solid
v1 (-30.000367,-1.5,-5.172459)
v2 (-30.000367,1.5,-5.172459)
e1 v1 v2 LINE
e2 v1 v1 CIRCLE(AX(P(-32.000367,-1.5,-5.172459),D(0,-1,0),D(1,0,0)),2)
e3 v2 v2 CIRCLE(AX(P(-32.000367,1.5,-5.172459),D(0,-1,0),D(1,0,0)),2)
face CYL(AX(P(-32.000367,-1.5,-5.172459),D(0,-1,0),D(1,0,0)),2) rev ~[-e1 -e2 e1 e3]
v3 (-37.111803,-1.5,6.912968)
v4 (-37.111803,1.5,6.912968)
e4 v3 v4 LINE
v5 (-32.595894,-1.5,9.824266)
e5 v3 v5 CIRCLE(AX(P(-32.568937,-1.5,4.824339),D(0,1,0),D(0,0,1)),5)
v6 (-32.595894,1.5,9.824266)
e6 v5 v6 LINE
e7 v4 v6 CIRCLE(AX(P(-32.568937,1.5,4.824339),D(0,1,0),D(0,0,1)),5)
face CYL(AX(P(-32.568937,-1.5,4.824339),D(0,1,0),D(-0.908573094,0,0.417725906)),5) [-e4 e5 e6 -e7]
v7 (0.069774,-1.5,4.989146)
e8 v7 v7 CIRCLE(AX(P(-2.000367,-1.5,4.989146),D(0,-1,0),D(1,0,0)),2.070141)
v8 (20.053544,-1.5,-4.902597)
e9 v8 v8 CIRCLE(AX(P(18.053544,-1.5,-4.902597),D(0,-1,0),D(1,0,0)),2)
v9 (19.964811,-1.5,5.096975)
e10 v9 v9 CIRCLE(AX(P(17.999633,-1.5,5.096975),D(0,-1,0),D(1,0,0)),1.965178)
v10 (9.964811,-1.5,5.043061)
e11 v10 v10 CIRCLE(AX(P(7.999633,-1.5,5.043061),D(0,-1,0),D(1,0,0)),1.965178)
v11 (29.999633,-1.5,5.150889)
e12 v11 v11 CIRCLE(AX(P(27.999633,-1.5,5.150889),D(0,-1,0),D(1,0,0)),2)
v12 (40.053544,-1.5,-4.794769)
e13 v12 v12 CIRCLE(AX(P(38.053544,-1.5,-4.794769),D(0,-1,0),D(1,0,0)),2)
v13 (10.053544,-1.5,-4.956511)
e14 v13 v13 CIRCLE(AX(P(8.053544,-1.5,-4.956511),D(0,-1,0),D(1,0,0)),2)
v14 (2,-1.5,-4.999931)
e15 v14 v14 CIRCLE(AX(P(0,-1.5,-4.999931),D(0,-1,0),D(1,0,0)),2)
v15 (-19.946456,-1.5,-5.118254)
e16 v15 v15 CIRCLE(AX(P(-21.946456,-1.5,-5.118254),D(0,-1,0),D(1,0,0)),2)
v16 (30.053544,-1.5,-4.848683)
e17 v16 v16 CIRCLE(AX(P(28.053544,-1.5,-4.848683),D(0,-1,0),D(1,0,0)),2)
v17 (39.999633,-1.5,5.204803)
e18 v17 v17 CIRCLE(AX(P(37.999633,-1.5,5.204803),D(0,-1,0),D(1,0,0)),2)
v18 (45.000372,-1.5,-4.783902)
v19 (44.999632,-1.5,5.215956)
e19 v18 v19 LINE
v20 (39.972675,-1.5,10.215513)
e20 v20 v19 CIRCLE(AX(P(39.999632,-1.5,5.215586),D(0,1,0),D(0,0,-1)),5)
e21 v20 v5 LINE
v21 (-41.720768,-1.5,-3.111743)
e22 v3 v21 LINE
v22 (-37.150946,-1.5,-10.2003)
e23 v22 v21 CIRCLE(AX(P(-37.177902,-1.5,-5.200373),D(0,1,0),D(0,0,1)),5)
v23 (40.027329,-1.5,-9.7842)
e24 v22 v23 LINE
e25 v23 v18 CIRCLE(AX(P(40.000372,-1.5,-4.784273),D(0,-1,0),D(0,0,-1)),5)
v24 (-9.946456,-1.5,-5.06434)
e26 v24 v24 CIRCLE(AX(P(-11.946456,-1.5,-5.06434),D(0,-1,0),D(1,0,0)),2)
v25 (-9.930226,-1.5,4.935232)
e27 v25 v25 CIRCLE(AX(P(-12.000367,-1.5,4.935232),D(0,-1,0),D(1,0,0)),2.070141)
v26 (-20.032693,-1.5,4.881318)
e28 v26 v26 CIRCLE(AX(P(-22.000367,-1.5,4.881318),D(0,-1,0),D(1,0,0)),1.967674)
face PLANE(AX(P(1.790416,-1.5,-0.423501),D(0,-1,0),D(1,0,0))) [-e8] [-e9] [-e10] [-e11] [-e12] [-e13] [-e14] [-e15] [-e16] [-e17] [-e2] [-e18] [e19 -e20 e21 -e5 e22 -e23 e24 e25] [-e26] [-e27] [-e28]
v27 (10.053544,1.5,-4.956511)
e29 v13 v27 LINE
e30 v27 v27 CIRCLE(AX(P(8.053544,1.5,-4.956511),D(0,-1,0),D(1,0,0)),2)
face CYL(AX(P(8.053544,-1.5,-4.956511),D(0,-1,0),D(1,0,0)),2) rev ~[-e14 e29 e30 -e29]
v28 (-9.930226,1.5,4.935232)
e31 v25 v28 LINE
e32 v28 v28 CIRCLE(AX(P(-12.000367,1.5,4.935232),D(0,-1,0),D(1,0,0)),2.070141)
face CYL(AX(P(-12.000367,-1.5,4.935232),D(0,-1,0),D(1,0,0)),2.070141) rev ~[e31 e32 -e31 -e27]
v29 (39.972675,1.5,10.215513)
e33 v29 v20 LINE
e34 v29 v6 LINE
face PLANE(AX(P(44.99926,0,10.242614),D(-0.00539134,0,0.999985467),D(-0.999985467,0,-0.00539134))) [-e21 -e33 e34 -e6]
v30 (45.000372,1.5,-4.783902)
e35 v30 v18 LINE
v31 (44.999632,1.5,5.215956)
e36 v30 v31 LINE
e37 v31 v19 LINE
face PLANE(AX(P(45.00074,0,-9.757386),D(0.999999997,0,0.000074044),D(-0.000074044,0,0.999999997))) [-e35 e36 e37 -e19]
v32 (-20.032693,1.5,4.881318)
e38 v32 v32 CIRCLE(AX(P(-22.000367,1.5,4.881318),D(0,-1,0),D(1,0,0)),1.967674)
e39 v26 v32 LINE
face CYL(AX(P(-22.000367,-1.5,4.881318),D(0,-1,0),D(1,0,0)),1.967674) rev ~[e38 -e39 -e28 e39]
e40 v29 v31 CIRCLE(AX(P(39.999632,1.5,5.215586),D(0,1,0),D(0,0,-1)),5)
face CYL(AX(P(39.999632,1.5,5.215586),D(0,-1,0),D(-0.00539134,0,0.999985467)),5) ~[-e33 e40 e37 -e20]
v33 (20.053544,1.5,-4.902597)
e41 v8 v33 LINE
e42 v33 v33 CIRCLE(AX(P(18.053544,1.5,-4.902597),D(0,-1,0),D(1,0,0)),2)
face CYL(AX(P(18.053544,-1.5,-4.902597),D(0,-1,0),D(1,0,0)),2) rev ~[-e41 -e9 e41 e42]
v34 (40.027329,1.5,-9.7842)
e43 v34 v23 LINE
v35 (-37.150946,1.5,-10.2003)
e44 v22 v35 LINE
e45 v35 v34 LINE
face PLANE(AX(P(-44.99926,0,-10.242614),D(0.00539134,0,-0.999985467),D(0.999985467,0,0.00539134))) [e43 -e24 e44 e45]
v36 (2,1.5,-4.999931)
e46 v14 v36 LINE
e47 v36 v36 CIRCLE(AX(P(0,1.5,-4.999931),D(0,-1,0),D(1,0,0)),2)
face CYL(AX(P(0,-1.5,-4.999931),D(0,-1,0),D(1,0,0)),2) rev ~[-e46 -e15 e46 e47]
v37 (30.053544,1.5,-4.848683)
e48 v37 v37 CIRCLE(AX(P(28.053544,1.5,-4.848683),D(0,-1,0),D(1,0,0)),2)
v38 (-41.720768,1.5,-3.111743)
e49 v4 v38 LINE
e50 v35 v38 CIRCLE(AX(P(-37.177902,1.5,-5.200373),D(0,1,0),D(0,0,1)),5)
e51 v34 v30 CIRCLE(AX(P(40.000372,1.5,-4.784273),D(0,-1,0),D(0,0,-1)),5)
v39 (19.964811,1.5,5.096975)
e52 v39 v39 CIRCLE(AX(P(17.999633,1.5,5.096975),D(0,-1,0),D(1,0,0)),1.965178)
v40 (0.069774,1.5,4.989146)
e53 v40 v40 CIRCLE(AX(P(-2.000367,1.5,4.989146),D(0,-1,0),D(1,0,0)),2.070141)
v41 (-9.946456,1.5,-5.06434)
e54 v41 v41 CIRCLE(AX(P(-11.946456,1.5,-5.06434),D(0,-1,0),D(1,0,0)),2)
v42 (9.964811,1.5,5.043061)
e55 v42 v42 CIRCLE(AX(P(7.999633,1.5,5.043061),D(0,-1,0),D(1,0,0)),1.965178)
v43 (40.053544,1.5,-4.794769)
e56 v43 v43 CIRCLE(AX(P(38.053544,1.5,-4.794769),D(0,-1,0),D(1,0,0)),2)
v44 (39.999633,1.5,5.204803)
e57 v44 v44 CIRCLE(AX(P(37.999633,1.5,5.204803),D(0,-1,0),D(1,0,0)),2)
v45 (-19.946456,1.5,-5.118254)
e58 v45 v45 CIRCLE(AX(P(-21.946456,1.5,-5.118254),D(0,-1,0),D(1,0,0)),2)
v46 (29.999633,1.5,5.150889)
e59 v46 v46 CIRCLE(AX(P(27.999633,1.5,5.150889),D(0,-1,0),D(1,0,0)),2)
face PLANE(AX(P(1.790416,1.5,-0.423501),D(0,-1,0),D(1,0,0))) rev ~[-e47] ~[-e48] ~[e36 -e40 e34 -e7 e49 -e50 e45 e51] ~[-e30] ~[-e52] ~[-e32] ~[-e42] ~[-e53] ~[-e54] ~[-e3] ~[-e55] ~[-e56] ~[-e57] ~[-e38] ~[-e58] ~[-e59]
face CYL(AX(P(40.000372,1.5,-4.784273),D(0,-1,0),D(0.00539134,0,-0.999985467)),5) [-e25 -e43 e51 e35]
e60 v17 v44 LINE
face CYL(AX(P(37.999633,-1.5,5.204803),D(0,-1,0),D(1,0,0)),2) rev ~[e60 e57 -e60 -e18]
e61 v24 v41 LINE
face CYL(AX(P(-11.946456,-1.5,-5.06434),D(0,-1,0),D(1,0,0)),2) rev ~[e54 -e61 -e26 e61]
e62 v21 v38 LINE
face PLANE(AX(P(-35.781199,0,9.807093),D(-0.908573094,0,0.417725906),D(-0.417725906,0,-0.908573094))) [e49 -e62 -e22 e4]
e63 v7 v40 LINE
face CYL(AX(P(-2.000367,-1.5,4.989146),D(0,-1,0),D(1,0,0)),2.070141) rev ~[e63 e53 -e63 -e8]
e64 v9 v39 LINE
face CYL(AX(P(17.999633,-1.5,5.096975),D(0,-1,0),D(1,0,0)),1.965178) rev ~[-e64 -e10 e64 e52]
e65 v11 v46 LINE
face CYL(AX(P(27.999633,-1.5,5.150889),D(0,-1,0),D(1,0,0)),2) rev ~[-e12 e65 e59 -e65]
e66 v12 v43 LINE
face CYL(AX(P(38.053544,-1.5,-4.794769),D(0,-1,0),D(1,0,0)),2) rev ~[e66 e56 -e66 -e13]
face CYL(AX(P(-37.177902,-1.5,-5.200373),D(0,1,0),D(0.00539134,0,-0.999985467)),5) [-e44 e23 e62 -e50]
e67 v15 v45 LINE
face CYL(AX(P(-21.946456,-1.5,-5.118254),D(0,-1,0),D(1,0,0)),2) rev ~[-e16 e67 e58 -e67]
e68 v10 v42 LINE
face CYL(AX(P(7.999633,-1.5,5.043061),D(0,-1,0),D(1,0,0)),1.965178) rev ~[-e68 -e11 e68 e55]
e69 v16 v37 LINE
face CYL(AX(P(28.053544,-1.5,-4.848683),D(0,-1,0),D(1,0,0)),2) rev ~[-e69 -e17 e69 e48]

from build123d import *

# Parameters (mm, degrees)
F1_DEPTH = 1.5
F2_R     = 5
F3_R     = 2
F3_R_2   = 1.965178389
F3_R_3   = 2.0701414228
F3_R_4   = 1.9676743652
F4_DEPTH = 25


# Not quite as in the source:
# - a feature names something its author has since deleted; it is built from what else it names


with BuildPart() as f1:
    # F0 (on Front) → F1 (new body, symmetric)
    with BuildSketch(Plane.XZ):
        Polygon((-44.9992595649, -10.2426138069), (45.0007404351, -9.7573861383), (44.9992595649, 10.2426138069), (-35.7811990629, 9.8070925446), align=None)
    extrude(amount=F1_DEPTH, both=True)

    # F2
    f2_edges = [f1.edges().sort_by_distance(p)[0] for p in [
        (45.00074, 0, -9.757386),
        (-35.781199, 0, 9.807093),
        (-44.99926, 0, -10.242614),
        (44.99926, 0, 10.242614),
    ]]
    fillet(f2_edges, radius=F2_R)

    # F3 (on face) → F4 (cut)
    with BuildSketch(Plane.XZ.offset(1.5)):
        with Locations((37.9996325629, 5.2048032201)):
            Circle(F3_R)
        with Locations((27.9996325629, 5.1508890347)):
            Circle(F3_R)
        with Locations((17.9996325629, 5.0969748493)):
            Circle(F3_R_2)
        with Locations((7.9996325629, 5.0430606639)):
            Circle(F3_R_2)
        with Locations((-2.0003674371, 4.9891464785)):
            Circle(F3_R_3)
        with Locations((-12.0003674371, 4.9352322931)):
            Circle(F3_R_3)
        with Locations((-22.0003674371, 4.8813181077)):
            Circle(F3_R_4)
        with Locations((38.0535444404, -4.7947687116)):
            Circle(F3_R)
        with Locations((28.0535444404, -4.848682897)):
            Circle(F3_R)
        with Locations((18.0535444404, -4.9025970824)):
            Circle(F3_R)
        with Locations((8.0535444404, -4.9565112678)):
            Circle(F3_R)
        with Locations((0, -4.9999312966)):
            Circle(F3_R)
        with Locations((-11.9464555596, -5.0643396386)):
            Circle(F3_R)
        with Locations((-21.9464555596, -5.118253824)):
            Circle(F3_R)
        with Locations((-32.0003674371, -5.1724586709)):
            Circle(F3_R)
    extrude(amount=-F4_DEPTH, mode=Mode.SUBTRACT)


solid = f1.part
